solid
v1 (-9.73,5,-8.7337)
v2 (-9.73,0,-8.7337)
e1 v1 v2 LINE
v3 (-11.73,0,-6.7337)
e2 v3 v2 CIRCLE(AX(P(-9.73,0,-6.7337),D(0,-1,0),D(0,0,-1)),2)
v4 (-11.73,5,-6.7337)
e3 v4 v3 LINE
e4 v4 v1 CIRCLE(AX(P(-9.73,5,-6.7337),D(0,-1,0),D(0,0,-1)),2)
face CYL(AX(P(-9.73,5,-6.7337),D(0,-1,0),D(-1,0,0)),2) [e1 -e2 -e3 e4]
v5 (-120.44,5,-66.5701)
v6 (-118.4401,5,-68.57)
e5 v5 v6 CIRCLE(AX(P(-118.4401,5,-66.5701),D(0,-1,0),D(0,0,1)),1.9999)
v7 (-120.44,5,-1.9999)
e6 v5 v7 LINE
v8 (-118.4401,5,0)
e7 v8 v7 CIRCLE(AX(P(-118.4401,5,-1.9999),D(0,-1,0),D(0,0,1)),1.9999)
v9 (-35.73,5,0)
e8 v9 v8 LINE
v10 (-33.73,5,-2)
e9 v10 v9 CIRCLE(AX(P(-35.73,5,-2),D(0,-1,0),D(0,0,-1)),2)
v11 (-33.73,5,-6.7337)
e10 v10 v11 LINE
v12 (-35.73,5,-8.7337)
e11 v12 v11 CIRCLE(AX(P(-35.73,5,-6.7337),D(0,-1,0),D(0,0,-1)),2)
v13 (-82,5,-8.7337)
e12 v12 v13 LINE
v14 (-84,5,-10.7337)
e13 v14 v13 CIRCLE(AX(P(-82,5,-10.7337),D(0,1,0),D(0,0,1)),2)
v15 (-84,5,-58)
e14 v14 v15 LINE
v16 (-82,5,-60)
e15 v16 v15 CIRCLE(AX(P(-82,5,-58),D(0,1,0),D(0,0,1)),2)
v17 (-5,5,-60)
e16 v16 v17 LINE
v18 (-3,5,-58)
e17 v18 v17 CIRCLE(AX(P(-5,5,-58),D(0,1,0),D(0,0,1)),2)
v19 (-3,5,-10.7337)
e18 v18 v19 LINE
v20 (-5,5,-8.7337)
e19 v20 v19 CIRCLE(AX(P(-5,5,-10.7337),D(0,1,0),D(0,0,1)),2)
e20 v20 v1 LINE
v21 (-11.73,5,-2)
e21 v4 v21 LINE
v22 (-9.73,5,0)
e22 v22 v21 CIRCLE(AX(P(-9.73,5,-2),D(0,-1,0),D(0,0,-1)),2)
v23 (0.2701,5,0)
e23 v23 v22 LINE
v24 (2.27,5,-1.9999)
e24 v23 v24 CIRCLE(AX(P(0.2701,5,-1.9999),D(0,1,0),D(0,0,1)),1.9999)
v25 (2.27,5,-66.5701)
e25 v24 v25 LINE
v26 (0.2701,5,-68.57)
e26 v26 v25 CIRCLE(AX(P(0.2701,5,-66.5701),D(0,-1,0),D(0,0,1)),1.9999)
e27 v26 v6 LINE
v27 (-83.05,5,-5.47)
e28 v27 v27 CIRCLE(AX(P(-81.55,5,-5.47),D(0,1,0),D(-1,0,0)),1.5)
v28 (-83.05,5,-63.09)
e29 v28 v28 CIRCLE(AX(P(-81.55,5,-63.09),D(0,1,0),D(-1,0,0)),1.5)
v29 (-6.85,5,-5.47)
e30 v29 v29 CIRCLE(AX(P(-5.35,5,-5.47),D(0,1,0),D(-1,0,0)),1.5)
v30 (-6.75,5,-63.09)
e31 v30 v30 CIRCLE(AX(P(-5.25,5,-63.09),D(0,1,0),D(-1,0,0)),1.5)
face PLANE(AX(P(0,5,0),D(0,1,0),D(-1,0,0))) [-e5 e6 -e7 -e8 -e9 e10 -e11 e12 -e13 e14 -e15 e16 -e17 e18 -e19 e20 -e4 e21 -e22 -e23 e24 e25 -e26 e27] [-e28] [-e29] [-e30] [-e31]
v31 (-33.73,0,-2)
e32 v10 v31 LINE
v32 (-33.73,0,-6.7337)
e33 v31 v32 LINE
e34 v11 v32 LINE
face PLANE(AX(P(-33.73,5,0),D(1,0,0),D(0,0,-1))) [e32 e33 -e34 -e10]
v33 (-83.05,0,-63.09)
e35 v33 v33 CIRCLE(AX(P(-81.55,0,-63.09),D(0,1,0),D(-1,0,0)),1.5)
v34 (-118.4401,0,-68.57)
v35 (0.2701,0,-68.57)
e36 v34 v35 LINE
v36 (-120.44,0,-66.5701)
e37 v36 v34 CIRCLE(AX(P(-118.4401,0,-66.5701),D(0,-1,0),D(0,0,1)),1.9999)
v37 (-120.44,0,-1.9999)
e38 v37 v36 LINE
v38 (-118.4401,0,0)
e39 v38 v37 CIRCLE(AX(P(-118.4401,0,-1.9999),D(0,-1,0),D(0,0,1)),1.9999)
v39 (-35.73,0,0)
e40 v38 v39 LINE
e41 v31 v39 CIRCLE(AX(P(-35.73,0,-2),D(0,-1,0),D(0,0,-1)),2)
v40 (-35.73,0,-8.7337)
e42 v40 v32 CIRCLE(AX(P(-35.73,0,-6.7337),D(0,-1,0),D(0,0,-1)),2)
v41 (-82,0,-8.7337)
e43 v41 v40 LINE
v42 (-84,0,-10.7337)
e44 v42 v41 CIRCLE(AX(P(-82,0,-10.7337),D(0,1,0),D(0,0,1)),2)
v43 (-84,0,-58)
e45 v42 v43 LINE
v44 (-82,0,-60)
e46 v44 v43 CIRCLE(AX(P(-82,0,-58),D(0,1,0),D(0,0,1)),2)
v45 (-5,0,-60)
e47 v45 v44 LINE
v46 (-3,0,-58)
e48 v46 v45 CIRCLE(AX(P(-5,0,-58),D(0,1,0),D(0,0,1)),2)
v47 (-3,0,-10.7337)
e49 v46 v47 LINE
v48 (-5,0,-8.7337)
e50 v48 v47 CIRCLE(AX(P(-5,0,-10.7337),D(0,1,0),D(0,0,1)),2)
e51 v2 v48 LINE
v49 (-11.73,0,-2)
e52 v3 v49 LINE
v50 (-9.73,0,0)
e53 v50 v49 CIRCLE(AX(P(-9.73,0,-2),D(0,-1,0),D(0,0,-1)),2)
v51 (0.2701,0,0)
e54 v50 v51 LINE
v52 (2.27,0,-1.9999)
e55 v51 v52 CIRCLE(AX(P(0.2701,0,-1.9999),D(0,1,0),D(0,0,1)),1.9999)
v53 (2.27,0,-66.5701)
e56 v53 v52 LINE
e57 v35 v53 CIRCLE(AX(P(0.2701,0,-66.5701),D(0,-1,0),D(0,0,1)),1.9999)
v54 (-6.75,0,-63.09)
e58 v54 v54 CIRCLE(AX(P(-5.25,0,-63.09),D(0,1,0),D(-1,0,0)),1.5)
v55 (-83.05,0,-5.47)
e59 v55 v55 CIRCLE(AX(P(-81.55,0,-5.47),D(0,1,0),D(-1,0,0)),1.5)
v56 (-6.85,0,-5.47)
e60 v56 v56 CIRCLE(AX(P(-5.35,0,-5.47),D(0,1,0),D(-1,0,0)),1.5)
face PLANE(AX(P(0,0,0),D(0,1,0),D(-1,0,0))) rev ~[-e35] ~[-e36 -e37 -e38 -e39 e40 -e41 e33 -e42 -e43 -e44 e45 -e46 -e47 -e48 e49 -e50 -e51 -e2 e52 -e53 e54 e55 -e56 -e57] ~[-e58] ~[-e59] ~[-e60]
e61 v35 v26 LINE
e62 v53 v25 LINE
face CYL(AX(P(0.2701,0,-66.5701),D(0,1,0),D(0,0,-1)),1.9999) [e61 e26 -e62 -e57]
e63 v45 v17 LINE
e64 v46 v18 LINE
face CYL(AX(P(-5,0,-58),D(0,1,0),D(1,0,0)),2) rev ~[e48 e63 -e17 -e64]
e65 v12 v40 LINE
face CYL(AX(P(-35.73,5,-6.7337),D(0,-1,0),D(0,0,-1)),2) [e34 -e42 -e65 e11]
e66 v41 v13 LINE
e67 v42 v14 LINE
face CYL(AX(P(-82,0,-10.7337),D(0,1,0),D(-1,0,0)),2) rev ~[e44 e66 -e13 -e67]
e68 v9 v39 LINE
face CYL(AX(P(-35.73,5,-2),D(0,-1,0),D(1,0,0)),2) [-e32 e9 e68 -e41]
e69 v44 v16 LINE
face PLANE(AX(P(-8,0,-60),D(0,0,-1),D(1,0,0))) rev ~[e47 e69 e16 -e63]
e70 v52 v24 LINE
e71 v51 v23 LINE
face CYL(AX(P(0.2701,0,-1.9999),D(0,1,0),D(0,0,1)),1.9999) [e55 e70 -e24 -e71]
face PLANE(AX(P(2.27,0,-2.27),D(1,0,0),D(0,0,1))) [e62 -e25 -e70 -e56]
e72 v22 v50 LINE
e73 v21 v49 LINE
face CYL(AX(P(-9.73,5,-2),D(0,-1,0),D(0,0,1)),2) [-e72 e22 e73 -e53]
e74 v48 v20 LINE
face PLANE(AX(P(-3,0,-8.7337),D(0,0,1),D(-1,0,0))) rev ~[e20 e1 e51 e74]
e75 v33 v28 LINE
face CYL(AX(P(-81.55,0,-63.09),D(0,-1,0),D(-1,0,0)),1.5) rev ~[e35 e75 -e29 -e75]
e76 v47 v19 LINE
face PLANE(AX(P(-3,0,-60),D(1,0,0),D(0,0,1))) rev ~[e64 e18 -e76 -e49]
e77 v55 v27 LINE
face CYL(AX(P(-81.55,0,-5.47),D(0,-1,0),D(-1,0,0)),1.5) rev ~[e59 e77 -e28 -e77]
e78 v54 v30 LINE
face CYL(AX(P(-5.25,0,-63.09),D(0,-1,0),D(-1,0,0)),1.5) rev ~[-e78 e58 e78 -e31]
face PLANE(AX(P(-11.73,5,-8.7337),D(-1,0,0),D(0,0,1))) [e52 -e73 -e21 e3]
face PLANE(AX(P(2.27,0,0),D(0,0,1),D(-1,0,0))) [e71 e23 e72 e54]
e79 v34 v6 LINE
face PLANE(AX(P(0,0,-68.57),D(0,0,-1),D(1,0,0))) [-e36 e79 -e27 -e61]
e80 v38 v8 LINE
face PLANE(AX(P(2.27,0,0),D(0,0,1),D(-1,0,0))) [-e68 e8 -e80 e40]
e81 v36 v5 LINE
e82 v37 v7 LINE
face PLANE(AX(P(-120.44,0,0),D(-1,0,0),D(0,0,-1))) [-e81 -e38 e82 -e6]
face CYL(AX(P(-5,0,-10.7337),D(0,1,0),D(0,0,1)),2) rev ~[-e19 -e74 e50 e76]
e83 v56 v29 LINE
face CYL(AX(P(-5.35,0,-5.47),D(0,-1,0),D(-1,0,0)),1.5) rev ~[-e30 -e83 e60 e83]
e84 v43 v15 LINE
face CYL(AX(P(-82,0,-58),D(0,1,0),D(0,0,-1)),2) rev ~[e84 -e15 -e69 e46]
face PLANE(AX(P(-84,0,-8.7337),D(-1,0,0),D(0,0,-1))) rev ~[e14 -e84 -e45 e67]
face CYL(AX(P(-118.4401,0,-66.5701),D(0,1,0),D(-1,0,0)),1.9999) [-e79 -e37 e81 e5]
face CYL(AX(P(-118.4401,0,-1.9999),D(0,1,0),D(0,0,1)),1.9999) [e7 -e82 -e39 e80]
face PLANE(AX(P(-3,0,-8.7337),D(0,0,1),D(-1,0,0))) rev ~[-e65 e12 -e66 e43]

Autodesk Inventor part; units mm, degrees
ref_plane "YZ Plane" through (0, 0, 0) normal (1, 0, 0) x (0, 1, 0)
ref_plane "XZ Plane" through (0, 0, 0) normal (0, 1, 0) x (-1, 0, 0)
ref_plane "XY Plane" through (0, 0, 0) normal (0, 0, 1) x (1, 0, 0)
sketch "Sketch1" plane through (0, 0, 0) normal (0, 1, 0) x (-1, 0, 0)
  line L0 (-2.27, 0) -> (120.44, 0)
  line L1 (120.44, 0) -> (120.44, -68.57)
  line L2 (120.44, -68.57) -> (-2.27, -68.57)
  line L3 (-2.27, -68.57) -> (-2.27, 0)
  line L4 (120.44, -66.57) -> (120.44, -2)
  line L5 (0, -68.57) -> (118.44, -68.57)
  line L6 (-2.27, -2.27) -> (-2.27, -66.3)
  circle A0 centre (81.55, -63.09) radius 1.5
  circle A1 centre (81.55, -63.09) radius 1.5
  line L7 (70.44, -68.57) -> (15.73, -68.57)
  line L8 (51, 0) -> (75, 0)
  line L9 (26, 0) -> (51, 0)
  line L10 (84, -60) -> (79, -60)
  line L11 (79, -60) -> (79, -8.7337)
  line L12 (79, -8.7337) -> (84, -8.7337)
  line L13 (84, -8.7337) -> (84, -60)
  line L14 (8, -60) -> (3, -60)
  line L15 (3, -60) -> (3, -8.7337)
  line L16 (3, -8.7337) -> (8, -8.7337)
  line L17 (8, -8.7337) -> (8, -60)
  circle A2 centre (5.25, -63.09) radius 1.5
  circle A3 centre (5.35, -5.47) radius 1.5
  circle A4 centre (81.55, -5.47) radius 1.5
  circle A5 centre (81.55, -5.47) radius 1.5
  circle A6 centre (5.35, -5.47) radius 1.5
  circle A7 centre (5.25, -63.09) radius 1.5
  dimension "d20" = 3
  dimension "d27" = 3
  dimension "d28" = 3
  dimension "d29" = 3
  dimension "d30" = 68.57
extrude "Extrusion1" add sketch "Sketch1" along normal blind 5
fillet "Fillet4" radius 2 4 edges at (-120.44, 2.5, -68.57) (-120.44, 2.5, 0) (2.27, 2.5, -68.57) (2.27, 2.5, 0)
sketch "Sketch7" plane through (0, 5, 0) normal (0, 1, 0) x (1, 0, 0)
  line L0 (-117.44, 63.57) -> (-87.44, 63.57)
  line L1 (-87.44, 63.57) -> (-87.44, 5)
  line L2 (-87.44, 5) -> (-117.44, 5)
  line L3 (-117.44, 5) -> (-117.44, 63.57)
  line L4 (-120.44, 66.57) -> (-120.44, 2) projected
  line L5 (0.27, 68.57) -> (-118.44, 68.57) projected
  line L6 (-118.44, 0) -> (0.27, 0) projected
  point P0 (0, 0)
  dimension "d67" = 30
  dimension "d68" = 3
  dimension "d69" = 5
  dimension "d70" = 5
extrude "Extrusion6" [suppressed]
fillet "Fillet8" [suppressed]
sketch "Sketch8" plane through (0, 5, 0) normal (0, 1, 0) x (1, 0, 0)
  line L0 (-79, 60) -> (-8, 60)
  line L1 (-8, 60) -> (-8, 8.7337)
  line L2 (-8, 8.7337) -> (-79, 8.7337)
  line L3 (-79, 8.7337) -> (-79, 60)
  line L4 (-8, 8.7337) -> (-8, 60) projected
  line L5 (0.27, 68.57) -> (-118.44, 68.57) projected
  line L6 (-79, 60) -> (-79, 8.7337) projected
  line L7 (-3, 8.7337) -> (-8, 8.7337) projected
  line L8 (-8, 60) -> (-3, 60) projected
  point P0 (0, 0)
extrude "Extrusion7" cut sketch "Sketch8" against normal blind 10
sketch "Sketch9" plane through (0, 5, 0) normal (0, 1, 0) x (1, 0, 0)
  line L0 (-3, 8.7337) -> (-84, 8.7337) projected
  line L1 (-118.44, 0) -> (0.27, 0) projected
  line L2 (-33.73, 8.7337) -> (-11.73, 8.7337)
  line L3 (-11.73, 8.7337) -> (-11.73, 0)
  line L4 (-11.73, 0) -> (-33.73, 0)
  line L5 (-33.73, 0) -> (-33.73, 8.7337)
  line L6 (2.27, 2) -> (2.27, 66.57) projected
  point P0 (0, 0)
  point P1 (-79, 8.57)
  point P2 (-8, 8.57)
  point P3 (-33.73, 0)
  point P4 (-11.73, 8.57)
  point P5 (-11.73, 8.7337)
  point P6 (-79, 8.871)
  point P7 (-8, 8.871)
  point P8 (-11.73, 8.871)
  point P9 (-11.73, 8.7337)
  dimension "d78" = 22
  dimension "d81" = 14
  dimension "d82" = 8.7338
extrude "Extrusion8" cut sketch "Sketch9" against normal blind 5
fillet "Fillet9" radius 2 8 edges at (-84, 2.5, -60) (-3, 2.5, -60) (-3, 2.5, -8.7337) (-11.73, 2.5, -8.7337) (-11.73, 2.5, 0) (-33.73, 2.5, -8.7337) (-33.73, 2.5, 0) (-84, 2.5, -8.7337)
properties part number "Top PMMA"
